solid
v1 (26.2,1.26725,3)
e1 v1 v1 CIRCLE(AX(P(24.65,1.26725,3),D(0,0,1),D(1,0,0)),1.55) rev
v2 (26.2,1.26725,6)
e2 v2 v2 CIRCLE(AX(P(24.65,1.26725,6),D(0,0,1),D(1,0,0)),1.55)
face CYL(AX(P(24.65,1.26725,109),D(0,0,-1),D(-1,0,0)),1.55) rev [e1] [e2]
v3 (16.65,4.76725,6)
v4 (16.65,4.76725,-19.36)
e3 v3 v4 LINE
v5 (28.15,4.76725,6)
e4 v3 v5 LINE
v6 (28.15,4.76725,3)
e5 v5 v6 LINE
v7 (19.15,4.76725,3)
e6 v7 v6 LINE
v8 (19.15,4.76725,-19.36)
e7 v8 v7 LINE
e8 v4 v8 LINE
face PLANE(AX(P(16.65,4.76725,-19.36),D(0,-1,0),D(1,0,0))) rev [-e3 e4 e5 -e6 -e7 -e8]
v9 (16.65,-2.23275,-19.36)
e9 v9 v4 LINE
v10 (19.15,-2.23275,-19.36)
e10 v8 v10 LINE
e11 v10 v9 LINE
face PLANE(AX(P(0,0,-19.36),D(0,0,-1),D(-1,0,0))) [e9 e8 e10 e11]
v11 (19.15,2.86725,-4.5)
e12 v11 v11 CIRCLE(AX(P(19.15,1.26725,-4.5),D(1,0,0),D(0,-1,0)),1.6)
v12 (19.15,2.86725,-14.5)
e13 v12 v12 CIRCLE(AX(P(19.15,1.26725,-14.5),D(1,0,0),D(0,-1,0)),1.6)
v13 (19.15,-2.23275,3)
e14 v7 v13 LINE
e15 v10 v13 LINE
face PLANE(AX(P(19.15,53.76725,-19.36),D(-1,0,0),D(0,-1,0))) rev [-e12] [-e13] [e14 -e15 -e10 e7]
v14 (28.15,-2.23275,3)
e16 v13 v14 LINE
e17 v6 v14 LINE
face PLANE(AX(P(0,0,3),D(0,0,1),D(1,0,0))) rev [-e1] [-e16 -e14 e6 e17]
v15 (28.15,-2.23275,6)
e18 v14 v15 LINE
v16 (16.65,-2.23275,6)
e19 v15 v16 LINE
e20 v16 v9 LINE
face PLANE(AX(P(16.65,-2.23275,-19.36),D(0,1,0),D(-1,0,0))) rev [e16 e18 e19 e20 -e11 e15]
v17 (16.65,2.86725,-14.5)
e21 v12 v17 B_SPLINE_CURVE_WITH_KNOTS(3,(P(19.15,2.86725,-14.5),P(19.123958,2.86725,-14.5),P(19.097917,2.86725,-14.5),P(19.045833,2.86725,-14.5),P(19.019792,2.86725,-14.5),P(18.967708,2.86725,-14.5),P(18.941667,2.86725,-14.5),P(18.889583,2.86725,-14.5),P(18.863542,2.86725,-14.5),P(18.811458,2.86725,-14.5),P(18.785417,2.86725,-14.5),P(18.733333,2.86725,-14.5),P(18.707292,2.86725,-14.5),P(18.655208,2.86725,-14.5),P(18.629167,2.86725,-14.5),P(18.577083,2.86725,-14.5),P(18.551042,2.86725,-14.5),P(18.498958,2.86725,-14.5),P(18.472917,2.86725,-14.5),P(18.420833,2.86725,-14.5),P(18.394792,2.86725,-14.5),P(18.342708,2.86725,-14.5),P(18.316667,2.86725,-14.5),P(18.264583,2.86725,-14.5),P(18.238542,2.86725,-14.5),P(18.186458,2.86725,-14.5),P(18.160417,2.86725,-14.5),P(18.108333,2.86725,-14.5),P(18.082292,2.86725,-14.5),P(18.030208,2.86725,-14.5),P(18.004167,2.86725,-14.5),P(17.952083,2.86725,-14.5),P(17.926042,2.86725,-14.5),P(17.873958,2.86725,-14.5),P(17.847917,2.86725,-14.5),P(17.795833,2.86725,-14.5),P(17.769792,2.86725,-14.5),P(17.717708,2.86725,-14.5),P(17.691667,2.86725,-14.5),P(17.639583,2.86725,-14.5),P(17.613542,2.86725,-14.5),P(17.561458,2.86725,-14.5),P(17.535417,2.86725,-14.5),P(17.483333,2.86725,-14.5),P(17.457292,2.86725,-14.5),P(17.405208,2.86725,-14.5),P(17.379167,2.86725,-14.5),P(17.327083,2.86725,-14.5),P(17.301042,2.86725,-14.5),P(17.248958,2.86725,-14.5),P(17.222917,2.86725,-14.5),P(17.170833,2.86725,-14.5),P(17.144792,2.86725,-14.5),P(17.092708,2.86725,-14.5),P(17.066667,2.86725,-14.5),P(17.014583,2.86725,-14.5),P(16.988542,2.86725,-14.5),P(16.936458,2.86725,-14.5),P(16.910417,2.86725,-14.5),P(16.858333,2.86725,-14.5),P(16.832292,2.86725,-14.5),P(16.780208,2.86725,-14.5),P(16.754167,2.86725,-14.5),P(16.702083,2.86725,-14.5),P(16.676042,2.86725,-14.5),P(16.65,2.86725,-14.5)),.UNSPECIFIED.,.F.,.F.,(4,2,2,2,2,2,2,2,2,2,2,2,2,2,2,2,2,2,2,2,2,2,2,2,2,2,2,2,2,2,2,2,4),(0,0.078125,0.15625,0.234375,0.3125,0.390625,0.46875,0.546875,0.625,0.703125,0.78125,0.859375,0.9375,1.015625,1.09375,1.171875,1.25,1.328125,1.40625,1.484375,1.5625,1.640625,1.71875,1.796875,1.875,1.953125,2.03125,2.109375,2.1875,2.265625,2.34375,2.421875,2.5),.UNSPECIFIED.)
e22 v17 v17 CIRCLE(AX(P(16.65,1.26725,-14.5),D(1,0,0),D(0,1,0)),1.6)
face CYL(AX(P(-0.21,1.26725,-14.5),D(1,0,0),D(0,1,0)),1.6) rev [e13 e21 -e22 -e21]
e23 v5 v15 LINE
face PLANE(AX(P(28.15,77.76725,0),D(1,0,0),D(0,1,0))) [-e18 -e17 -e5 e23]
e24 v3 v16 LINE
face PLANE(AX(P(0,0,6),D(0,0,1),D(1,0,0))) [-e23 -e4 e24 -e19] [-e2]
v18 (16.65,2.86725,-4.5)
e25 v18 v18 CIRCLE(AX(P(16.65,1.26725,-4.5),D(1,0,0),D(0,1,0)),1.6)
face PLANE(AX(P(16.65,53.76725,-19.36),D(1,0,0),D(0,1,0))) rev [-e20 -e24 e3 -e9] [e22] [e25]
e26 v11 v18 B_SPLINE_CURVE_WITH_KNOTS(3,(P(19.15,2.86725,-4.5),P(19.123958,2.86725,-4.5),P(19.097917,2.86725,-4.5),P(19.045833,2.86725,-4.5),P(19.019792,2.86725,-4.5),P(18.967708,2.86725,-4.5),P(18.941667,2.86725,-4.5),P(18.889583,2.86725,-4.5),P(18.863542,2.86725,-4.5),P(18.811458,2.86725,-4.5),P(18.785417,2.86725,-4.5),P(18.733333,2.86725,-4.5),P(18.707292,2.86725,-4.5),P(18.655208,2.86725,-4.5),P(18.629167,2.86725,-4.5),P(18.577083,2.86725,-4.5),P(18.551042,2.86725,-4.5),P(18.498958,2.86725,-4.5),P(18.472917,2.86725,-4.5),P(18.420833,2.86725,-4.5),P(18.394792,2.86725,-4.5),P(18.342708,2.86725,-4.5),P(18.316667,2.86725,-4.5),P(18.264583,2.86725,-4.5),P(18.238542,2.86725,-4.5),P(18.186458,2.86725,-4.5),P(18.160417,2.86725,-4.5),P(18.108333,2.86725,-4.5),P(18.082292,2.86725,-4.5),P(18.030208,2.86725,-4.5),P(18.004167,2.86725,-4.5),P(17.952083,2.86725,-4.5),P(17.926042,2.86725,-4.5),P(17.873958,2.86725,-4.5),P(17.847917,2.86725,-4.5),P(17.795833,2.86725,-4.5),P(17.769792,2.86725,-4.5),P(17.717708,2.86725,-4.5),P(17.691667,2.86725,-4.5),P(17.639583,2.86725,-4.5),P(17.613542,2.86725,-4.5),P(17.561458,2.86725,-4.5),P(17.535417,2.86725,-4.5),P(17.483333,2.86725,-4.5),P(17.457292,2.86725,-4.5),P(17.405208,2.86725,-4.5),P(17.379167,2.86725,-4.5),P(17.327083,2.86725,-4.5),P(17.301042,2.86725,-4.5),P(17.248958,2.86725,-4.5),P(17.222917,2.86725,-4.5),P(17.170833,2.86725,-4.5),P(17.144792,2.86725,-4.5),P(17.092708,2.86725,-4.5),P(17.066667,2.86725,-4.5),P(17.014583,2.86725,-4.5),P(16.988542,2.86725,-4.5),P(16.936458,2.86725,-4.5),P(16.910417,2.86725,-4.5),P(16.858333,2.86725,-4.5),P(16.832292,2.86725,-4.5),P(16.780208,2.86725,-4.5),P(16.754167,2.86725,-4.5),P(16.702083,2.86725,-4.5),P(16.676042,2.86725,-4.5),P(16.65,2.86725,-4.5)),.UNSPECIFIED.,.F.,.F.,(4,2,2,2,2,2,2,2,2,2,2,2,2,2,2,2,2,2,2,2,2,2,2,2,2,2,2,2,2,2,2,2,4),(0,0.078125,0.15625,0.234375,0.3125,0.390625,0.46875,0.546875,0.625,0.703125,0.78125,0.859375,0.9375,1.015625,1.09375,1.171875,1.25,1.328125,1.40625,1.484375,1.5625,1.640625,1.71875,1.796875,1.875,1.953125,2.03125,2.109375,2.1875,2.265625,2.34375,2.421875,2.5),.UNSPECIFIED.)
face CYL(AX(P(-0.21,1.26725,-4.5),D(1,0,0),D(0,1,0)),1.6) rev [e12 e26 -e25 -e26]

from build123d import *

# Parameters (mm, degrees)
SKETCH1_W           = 132
SKETCH1_H           = 160
BOSS_EXTRUDE1_DEPTH = 6
SKETCH3_W           = 32
SKETCH3_H           = 54
SKETCH3_W_2         = 26
SKETCH3_H_2         = 48
BOSS_EXTRUDE2_DEPTH = 17.5
SKETCH4_W           = 32
SKETCH4_H           = 54
BOSS_EXTRUDE3_DEPTH = 3
SKETCH5_W           = 25
SKETCH5_H           = 17
CUT_EXTRUDE1_DEPTH  = 3
SKETCH6_W           = 12
SKETCH6_H           = 54
BOSS_EXTRUDE4_DEPTH = 3
SKETCH7_R           = 1.6
CUT_EXTRUDE2_DEPTH  = 106.177231376
SKETCH8_W           = 3
SKETCH8_H           = 6.5
BOSS_EXTRUDE5_DEPTH = 20
SKETCH9_R           = 1.55
CUT_EXTRUDE3_DEPTH  = 6
SKETCH10_R          = 1.6
CUT_EXTRUDE4_DEPTH  = 108.043215572
SKETCH11_W          = 2.5
SKETCH11_H          = 7
BOSS_EXTRUDE6_DEPTH = 19.36
SKETCH12_R          = 1.6
CUT_EXTRUDE5_DEPTH  = 19.36
SKETCH13_W          = 3
SKETCH13_H          = 7
BOSS_EXTRUDE7_DEPTH = 15
SKETCH14_R          = 2
CUT_EXTRUDE6_DEPTH  = 15
CUT_EXTRUDE7_START  = -6
CUT_EXTRUDE7_DEPTH  = 6
SKETCH16_R          = 1.6
CUT_EXTRUDE8_DEPTH  = 15
SKETCH17_W          = 117.76
SKETCH17_H          = 77.767250212
CUT_EXTRUDE9_DEPTH  = 109
SKETCH18_R          = 1.55
CUT_EXTRUDE10_DEPTH = 109
SKETCH18_3_W        = 9
SKETCH18_3_H        = 7
CUT_EXTRUDE11_DEPTH = 3
SKETCH19_W          = 47.5
SKETCH19_H          = 6
CUT_EXTRUDE12_DEPTH = 80
SKETCH19_3_W        = 2.7
SKETCH19_3_H        = 6
CUT_EXTRUDE13_DEPTH = 80
SKETCH19_4_W        = 9
SKETCH19_4_H        = 3
CUT_EXTRUDE14_DEPTH = 80
SKETCH20_W          = 62.599740271
SKETCH20_H          = 63.599226712
CUT_EXTRUDE15_DEPTH = 80


# Read off the part's stored shape, not the designer's step: Cut-Extrude7
with BuildPart() as part:
    # Sketch1 → Boss-Extrude1 (new body)
    with BuildSketch(Plane.XY):
        Rectangle(SKETCH1_W, SKETCH1_H)
    extrude(amount=BOSS_EXTRUDE1_DEPTH)

    # Sketch3 → Boss-Extrude2 (add)
    with BuildSketch(Plane.XY.offset(6)):
        with Locations((0, -53)):
            Rectangle(SKETCH3_W, SKETCH3_H)
        with Locations((0, -53)):
            Rectangle(SKETCH3_W_2, SKETCH3_H_2, mode=Mode.SUBTRACT)
    extrude(amount=BOSS_EXTRUDE2_DEPTH)

    # Sketch4 → Boss-Extrude3 (add)
    with BuildSketch(Plane.XY.offset(23.5)):
        with Locations((0, -53)):
            Rectangle(SKETCH4_W, SKETCH4_H)
    extrude(amount=BOSS_EXTRUDE3_DEPTH)

    # Sketch5 → Cut-Extrude1 (cut)
    with BuildSketch(Plane.XZ.offset(80)):
        with Locations((0, 14.5)):
            Rectangle(SKETCH5_W, SKETCH5_H)
    extrude(amount=-CUT_EXTRUDE1_DEPTH, mode=Mode.SUBTRACT)

    # Sketch6 → Boss-Extrude4 (add)
    with BuildSketch(Plane.XY.offset(6)):
        with Locations((-22, -53)):
            Rectangle(SKETCH6_W, SKETCH6_H)
        with Locations((22, -53)):
            Rectangle(SKETCH6_W, SKETCH6_H)
    extrude(amount=BOSS_EXTRUDE4_DEPTH)

    # Sketch7 → Cut-Extrude2 (cut, through all)
    with BuildSketch(Plane.XY.offset(9)):
        with Locations((-22, -69)):
            Circle(SKETCH7_R)
        with Locations((-22, -33)):
            Circle(SKETCH7_R)
        with Locations(Location((22, -69, 0), (0, 0, 180))):
            Circle(SKETCH7_R)
        with Locations(Location((22, -33, 0), (0, 0, 180))):
            Circle(SKETCH7_R)
    extrude(amount=-CUT_EXTRUDE2_DEPTH, mode=Mode.SUBTRACT)

    # Sketch8 → Boss-Extrude5 (add)
    with BuildSketch(Plane.XY.offset(6)):
        with Locations((-54.38, -76.75)):
            Rectangle(SKETCH8_W, SKETCH8_H)
        with Locations((-54.38, -30.25)):
            Rectangle(SKETCH8_W, SKETCH8_H)
    boss_extrude5 = extrude(amount=BOSS_EXTRUDE5_DEPTH)

    # Sketch9 → Cut-Extrude3 (cut)
    with BuildSketch(Plane.ZY.offset(55.88)):
        with Locations((10.35, -76.75)):
            Circle(SKETCH9_R)
        with Locations((19.65, -76.75)):
            Circle(SKETCH9_R)
        with Locations((10.35, -30.25)):
            Circle(SKETCH9_R)
        with Locations((19.65, -30.25)):
            Circle(SKETCH9_R)
    cut_extrude3 = extrude(amount=-CUT_EXTRUDE3_DEPTH, mode=Mode.SUBTRACT)

    # Mirror1: Boss-Extrude5, Cut-Extrude3 across plane
    add(boss_extrude5.mirror(Plane(origin=(0, 0, 0), x_dir=(0, 0, 1), z_dir=(1, 0, 0))))
    add(cut_extrude3.mirror(Plane(origin=(0, 0, 0), x_dir=(0, 0, 1), z_dir=(1, 0, 0))), mode=Mode.SUBTRACT)

    # Sketch10 → Cut-Extrude4 (cut, through all)
    with BuildSketch(Plane(origin=(0, 0, 0), x_dir=(-1, 0, 0), z_dir=(0, 0, -1))):
        with Locations((-24.1, -75.572749788)):
            Circle(SKETCH10_R)
        with Locations((-21.15, -12.732749788)):
            Circle(SKETCH10_R)
        with Locations(Location((21.15, -12.732749788, 0), (0, 0, 180))):
            Circle(SKETCH10_R)
        with Locations((24.1, -75.572749788)):
            Circle(SKETCH10_R)
    extrude(amount=-CUT_EXTRUDE4_DEPTH, mode=Mode.SUBTRACT)

    # Sketch11 → Boss-Extrude6 (add)
    with BuildSketch(Plane(origin=(0, 0, 0), x_dir=(-1, 0, 0), z_dir=(0, 0, -1))):
        with Locations((-17.9, 1.267250212)):
            Rectangle(SKETCH11_W, SKETCH11_H)
        with Locations((-17.9, 50.267250212)):
            Rectangle(SKETCH11_W, SKETCH11_H)
    extrude(amount=BOSS_EXTRUDE6_DEPTH)

    # Sketch12 → Cut-Extrude5 (cut)
    with BuildSketch(Plane(origin=(19.15, 0, 0), x_dir=(0, 0, -1), z_dir=(1, 0, 0))):
        with Locations(Location((4.5, 50.267250212, 0), (0, 0, 90))):
            Circle(SKETCH12_R)
        with Locations(Location((14.5, 50.267250212, 0), (0, 0, 90))):
            Circle(SKETCH12_R)
        with Locations(Location((4.5, 1.267250212, 0), (0, 0, 90))):
            Circle(SKETCH12_R)
        with Locations(Location((14.5, 1.267250212, 0), (0, 0, 90))):
            Circle(SKETCH12_R)
    extrude(amount=-CUT_EXTRUDE5_DEPTH, mode=Mode.SUBTRACT)

    # Sketch13 → Boss-Extrude7 (add)
    with BuildSketch(Plane(origin=(0, 0, 0), x_dir=(-1, 0, 0), z_dir=(0, 0, -1))):
        with Locations((29.35, 35.967250212)):
            Rectangle(SKETCH13_W, SKETCH13_H)
    extrude(amount=BOSS_EXTRUDE7_DEPTH)

    # Sketch14 → Cut-Extrude6 (cut)
    with BuildSketch(Plane.ZY.offset(30.85)):
        with Locations((-9.9, 35.967250212)):
            Circle(SKETCH14_R)
    extrude(amount=-CUT_EXTRUDE6_DEPTH, mode=Mode.SUBTRACT)

    # Cut-Extrude7 outline → Cut-Extrude7 (cut)
    with BuildSketch(Plane(origin=(0, 0, 0), x_dir=(-1, 0, 0), z_dir=(0, 0, -1)).offset(CUT_EXTRUDE7_START)):
        Polygon((-30.85, 56.767250212), (30.85, 56.767250212), (30.85, -24), (58.88, -24), (58.88, -80), (66, -80), (66, 80), (-66, 80), (-66, -80), (-58.88, -80), (-58.88, -24), (-30.85, -24), align=None)
    extrude(amount=CUT_EXTRUDE7_DEPTH, mode=Mode.SUBTRACT)

    # Sketch16 → Cut-Extrude8 (cut)
    with BuildSketch(Plane(origin=(0, 0, 0), x_dir=(-1, 0, 0), z_dir=(0, 0, -1))):
        Circle(SKETCH16_R)
        with Locations((0, 52.767250212)):
            Circle(SKETCH16_R)
    extrude(amount=-CUT_EXTRUDE8_DEPTH, mode=Mode.SUBTRACT)

    # Sketch17 → Cut-Extrude9 (cut)
    with BuildSketch(Plane(origin=(0, 0, 0), x_dir=(-1, 0, 0), z_dir=(0, 0, -1))):
        with Locations((0, -41.116374894)):
            Rectangle(SKETCH17_W, SKETCH17_H)
    extrude(amount=-CUT_EXTRUDE9_DEPTH, mode=Mode.SUBTRACT)

    # Sketch18 → Cut-Extrude10 (cut)
    with BuildSketch(Plane(origin=(0, 0, 0), x_dir=(-1, 0, 0), z_dir=(0, 0, -1))):
        with Locations((-24.65, 1.267250212)):
            Circle(SKETCH18_R)
    extrude(amount=-CUT_EXTRUDE10_DEPTH, mode=Mode.SUBTRACT)

    # Sketch18<3> → Cut-Extrude11 (cut)
    with BuildSketch(Plane(origin=(0, 0, 0), x_dir=(-1, 0, 0), z_dir=(0, 0, -1))):
        with Locations((-23.65, 1.267250212)):
            Rectangle(SKETCH18_3_W, SKETCH18_3_H)
    extrude(amount=-CUT_EXTRUDE11_DEPTH, mode=Mode.SUBTRACT)

    # Sketch19 → Cut-Extrude12 (cut)
    with BuildSketch(Plane.XZ.offset(2.232749788)):
        with Locations((-7.1, 3)):
            Rectangle(SKETCH19_W, SKETCH19_H)
    extrude(amount=-CUT_EXTRUDE12_DEPTH, mode=Mode.SUBTRACT)


with BuildPart() as body_2:
    # of the pieces the cut leaves, the one that is kept (cut_extrude12_keep)
    add(part.part.solids().sort_by_distance((30.85, -2.232749788, 0))[0])

    # Sketch19<3> → Cut-Extrude13 (cut)
    with BuildSketch(Plane.XZ.offset(2.232749788)):
        with Locations((29.5, 3)):
            Rectangle(SKETCH19_3_W, SKETCH19_3_H)
    extrude(amount=-CUT_EXTRUDE13_DEPTH, mode=Mode.SUBTRACT)

    # Sketch19<4> → Cut-Extrude14 (cut)
    with BuildSketch(Plane.XZ.offset(2.232749788)):
        with Locations((23.65, 1.5)):
            Rectangle(SKETCH19_4_W, SKETCH19_4_H)
    extrude(amount=-CUT_EXTRUDE14_DEPTH, mode=Mode.SUBTRACT)

    # Sketch20 → Cut-Extrude15 (cut)
    with BuildSketch(Plane(origin=(0, 0, 0), x_dir=(-1, 0, 0), z_dir=(0, 0, -1))):
        with Locations((-47.949870136, 36.566863568)):
            Rectangle(SKETCH20_W, SKETCH20_H)
    extrude(amount=-CUT_EXTRUDE15_DEPTH, mode=Mode.SUBTRACT)


with BuildPart() as body_2_2:
    # of the pieces the cut leaves, the one that is kept (cut_extrude15_keep)
    add(body_2.part.solids().sort_by_distance((16.65, -2.232749788, -19.36))[0])


solid = body_2_2.part
